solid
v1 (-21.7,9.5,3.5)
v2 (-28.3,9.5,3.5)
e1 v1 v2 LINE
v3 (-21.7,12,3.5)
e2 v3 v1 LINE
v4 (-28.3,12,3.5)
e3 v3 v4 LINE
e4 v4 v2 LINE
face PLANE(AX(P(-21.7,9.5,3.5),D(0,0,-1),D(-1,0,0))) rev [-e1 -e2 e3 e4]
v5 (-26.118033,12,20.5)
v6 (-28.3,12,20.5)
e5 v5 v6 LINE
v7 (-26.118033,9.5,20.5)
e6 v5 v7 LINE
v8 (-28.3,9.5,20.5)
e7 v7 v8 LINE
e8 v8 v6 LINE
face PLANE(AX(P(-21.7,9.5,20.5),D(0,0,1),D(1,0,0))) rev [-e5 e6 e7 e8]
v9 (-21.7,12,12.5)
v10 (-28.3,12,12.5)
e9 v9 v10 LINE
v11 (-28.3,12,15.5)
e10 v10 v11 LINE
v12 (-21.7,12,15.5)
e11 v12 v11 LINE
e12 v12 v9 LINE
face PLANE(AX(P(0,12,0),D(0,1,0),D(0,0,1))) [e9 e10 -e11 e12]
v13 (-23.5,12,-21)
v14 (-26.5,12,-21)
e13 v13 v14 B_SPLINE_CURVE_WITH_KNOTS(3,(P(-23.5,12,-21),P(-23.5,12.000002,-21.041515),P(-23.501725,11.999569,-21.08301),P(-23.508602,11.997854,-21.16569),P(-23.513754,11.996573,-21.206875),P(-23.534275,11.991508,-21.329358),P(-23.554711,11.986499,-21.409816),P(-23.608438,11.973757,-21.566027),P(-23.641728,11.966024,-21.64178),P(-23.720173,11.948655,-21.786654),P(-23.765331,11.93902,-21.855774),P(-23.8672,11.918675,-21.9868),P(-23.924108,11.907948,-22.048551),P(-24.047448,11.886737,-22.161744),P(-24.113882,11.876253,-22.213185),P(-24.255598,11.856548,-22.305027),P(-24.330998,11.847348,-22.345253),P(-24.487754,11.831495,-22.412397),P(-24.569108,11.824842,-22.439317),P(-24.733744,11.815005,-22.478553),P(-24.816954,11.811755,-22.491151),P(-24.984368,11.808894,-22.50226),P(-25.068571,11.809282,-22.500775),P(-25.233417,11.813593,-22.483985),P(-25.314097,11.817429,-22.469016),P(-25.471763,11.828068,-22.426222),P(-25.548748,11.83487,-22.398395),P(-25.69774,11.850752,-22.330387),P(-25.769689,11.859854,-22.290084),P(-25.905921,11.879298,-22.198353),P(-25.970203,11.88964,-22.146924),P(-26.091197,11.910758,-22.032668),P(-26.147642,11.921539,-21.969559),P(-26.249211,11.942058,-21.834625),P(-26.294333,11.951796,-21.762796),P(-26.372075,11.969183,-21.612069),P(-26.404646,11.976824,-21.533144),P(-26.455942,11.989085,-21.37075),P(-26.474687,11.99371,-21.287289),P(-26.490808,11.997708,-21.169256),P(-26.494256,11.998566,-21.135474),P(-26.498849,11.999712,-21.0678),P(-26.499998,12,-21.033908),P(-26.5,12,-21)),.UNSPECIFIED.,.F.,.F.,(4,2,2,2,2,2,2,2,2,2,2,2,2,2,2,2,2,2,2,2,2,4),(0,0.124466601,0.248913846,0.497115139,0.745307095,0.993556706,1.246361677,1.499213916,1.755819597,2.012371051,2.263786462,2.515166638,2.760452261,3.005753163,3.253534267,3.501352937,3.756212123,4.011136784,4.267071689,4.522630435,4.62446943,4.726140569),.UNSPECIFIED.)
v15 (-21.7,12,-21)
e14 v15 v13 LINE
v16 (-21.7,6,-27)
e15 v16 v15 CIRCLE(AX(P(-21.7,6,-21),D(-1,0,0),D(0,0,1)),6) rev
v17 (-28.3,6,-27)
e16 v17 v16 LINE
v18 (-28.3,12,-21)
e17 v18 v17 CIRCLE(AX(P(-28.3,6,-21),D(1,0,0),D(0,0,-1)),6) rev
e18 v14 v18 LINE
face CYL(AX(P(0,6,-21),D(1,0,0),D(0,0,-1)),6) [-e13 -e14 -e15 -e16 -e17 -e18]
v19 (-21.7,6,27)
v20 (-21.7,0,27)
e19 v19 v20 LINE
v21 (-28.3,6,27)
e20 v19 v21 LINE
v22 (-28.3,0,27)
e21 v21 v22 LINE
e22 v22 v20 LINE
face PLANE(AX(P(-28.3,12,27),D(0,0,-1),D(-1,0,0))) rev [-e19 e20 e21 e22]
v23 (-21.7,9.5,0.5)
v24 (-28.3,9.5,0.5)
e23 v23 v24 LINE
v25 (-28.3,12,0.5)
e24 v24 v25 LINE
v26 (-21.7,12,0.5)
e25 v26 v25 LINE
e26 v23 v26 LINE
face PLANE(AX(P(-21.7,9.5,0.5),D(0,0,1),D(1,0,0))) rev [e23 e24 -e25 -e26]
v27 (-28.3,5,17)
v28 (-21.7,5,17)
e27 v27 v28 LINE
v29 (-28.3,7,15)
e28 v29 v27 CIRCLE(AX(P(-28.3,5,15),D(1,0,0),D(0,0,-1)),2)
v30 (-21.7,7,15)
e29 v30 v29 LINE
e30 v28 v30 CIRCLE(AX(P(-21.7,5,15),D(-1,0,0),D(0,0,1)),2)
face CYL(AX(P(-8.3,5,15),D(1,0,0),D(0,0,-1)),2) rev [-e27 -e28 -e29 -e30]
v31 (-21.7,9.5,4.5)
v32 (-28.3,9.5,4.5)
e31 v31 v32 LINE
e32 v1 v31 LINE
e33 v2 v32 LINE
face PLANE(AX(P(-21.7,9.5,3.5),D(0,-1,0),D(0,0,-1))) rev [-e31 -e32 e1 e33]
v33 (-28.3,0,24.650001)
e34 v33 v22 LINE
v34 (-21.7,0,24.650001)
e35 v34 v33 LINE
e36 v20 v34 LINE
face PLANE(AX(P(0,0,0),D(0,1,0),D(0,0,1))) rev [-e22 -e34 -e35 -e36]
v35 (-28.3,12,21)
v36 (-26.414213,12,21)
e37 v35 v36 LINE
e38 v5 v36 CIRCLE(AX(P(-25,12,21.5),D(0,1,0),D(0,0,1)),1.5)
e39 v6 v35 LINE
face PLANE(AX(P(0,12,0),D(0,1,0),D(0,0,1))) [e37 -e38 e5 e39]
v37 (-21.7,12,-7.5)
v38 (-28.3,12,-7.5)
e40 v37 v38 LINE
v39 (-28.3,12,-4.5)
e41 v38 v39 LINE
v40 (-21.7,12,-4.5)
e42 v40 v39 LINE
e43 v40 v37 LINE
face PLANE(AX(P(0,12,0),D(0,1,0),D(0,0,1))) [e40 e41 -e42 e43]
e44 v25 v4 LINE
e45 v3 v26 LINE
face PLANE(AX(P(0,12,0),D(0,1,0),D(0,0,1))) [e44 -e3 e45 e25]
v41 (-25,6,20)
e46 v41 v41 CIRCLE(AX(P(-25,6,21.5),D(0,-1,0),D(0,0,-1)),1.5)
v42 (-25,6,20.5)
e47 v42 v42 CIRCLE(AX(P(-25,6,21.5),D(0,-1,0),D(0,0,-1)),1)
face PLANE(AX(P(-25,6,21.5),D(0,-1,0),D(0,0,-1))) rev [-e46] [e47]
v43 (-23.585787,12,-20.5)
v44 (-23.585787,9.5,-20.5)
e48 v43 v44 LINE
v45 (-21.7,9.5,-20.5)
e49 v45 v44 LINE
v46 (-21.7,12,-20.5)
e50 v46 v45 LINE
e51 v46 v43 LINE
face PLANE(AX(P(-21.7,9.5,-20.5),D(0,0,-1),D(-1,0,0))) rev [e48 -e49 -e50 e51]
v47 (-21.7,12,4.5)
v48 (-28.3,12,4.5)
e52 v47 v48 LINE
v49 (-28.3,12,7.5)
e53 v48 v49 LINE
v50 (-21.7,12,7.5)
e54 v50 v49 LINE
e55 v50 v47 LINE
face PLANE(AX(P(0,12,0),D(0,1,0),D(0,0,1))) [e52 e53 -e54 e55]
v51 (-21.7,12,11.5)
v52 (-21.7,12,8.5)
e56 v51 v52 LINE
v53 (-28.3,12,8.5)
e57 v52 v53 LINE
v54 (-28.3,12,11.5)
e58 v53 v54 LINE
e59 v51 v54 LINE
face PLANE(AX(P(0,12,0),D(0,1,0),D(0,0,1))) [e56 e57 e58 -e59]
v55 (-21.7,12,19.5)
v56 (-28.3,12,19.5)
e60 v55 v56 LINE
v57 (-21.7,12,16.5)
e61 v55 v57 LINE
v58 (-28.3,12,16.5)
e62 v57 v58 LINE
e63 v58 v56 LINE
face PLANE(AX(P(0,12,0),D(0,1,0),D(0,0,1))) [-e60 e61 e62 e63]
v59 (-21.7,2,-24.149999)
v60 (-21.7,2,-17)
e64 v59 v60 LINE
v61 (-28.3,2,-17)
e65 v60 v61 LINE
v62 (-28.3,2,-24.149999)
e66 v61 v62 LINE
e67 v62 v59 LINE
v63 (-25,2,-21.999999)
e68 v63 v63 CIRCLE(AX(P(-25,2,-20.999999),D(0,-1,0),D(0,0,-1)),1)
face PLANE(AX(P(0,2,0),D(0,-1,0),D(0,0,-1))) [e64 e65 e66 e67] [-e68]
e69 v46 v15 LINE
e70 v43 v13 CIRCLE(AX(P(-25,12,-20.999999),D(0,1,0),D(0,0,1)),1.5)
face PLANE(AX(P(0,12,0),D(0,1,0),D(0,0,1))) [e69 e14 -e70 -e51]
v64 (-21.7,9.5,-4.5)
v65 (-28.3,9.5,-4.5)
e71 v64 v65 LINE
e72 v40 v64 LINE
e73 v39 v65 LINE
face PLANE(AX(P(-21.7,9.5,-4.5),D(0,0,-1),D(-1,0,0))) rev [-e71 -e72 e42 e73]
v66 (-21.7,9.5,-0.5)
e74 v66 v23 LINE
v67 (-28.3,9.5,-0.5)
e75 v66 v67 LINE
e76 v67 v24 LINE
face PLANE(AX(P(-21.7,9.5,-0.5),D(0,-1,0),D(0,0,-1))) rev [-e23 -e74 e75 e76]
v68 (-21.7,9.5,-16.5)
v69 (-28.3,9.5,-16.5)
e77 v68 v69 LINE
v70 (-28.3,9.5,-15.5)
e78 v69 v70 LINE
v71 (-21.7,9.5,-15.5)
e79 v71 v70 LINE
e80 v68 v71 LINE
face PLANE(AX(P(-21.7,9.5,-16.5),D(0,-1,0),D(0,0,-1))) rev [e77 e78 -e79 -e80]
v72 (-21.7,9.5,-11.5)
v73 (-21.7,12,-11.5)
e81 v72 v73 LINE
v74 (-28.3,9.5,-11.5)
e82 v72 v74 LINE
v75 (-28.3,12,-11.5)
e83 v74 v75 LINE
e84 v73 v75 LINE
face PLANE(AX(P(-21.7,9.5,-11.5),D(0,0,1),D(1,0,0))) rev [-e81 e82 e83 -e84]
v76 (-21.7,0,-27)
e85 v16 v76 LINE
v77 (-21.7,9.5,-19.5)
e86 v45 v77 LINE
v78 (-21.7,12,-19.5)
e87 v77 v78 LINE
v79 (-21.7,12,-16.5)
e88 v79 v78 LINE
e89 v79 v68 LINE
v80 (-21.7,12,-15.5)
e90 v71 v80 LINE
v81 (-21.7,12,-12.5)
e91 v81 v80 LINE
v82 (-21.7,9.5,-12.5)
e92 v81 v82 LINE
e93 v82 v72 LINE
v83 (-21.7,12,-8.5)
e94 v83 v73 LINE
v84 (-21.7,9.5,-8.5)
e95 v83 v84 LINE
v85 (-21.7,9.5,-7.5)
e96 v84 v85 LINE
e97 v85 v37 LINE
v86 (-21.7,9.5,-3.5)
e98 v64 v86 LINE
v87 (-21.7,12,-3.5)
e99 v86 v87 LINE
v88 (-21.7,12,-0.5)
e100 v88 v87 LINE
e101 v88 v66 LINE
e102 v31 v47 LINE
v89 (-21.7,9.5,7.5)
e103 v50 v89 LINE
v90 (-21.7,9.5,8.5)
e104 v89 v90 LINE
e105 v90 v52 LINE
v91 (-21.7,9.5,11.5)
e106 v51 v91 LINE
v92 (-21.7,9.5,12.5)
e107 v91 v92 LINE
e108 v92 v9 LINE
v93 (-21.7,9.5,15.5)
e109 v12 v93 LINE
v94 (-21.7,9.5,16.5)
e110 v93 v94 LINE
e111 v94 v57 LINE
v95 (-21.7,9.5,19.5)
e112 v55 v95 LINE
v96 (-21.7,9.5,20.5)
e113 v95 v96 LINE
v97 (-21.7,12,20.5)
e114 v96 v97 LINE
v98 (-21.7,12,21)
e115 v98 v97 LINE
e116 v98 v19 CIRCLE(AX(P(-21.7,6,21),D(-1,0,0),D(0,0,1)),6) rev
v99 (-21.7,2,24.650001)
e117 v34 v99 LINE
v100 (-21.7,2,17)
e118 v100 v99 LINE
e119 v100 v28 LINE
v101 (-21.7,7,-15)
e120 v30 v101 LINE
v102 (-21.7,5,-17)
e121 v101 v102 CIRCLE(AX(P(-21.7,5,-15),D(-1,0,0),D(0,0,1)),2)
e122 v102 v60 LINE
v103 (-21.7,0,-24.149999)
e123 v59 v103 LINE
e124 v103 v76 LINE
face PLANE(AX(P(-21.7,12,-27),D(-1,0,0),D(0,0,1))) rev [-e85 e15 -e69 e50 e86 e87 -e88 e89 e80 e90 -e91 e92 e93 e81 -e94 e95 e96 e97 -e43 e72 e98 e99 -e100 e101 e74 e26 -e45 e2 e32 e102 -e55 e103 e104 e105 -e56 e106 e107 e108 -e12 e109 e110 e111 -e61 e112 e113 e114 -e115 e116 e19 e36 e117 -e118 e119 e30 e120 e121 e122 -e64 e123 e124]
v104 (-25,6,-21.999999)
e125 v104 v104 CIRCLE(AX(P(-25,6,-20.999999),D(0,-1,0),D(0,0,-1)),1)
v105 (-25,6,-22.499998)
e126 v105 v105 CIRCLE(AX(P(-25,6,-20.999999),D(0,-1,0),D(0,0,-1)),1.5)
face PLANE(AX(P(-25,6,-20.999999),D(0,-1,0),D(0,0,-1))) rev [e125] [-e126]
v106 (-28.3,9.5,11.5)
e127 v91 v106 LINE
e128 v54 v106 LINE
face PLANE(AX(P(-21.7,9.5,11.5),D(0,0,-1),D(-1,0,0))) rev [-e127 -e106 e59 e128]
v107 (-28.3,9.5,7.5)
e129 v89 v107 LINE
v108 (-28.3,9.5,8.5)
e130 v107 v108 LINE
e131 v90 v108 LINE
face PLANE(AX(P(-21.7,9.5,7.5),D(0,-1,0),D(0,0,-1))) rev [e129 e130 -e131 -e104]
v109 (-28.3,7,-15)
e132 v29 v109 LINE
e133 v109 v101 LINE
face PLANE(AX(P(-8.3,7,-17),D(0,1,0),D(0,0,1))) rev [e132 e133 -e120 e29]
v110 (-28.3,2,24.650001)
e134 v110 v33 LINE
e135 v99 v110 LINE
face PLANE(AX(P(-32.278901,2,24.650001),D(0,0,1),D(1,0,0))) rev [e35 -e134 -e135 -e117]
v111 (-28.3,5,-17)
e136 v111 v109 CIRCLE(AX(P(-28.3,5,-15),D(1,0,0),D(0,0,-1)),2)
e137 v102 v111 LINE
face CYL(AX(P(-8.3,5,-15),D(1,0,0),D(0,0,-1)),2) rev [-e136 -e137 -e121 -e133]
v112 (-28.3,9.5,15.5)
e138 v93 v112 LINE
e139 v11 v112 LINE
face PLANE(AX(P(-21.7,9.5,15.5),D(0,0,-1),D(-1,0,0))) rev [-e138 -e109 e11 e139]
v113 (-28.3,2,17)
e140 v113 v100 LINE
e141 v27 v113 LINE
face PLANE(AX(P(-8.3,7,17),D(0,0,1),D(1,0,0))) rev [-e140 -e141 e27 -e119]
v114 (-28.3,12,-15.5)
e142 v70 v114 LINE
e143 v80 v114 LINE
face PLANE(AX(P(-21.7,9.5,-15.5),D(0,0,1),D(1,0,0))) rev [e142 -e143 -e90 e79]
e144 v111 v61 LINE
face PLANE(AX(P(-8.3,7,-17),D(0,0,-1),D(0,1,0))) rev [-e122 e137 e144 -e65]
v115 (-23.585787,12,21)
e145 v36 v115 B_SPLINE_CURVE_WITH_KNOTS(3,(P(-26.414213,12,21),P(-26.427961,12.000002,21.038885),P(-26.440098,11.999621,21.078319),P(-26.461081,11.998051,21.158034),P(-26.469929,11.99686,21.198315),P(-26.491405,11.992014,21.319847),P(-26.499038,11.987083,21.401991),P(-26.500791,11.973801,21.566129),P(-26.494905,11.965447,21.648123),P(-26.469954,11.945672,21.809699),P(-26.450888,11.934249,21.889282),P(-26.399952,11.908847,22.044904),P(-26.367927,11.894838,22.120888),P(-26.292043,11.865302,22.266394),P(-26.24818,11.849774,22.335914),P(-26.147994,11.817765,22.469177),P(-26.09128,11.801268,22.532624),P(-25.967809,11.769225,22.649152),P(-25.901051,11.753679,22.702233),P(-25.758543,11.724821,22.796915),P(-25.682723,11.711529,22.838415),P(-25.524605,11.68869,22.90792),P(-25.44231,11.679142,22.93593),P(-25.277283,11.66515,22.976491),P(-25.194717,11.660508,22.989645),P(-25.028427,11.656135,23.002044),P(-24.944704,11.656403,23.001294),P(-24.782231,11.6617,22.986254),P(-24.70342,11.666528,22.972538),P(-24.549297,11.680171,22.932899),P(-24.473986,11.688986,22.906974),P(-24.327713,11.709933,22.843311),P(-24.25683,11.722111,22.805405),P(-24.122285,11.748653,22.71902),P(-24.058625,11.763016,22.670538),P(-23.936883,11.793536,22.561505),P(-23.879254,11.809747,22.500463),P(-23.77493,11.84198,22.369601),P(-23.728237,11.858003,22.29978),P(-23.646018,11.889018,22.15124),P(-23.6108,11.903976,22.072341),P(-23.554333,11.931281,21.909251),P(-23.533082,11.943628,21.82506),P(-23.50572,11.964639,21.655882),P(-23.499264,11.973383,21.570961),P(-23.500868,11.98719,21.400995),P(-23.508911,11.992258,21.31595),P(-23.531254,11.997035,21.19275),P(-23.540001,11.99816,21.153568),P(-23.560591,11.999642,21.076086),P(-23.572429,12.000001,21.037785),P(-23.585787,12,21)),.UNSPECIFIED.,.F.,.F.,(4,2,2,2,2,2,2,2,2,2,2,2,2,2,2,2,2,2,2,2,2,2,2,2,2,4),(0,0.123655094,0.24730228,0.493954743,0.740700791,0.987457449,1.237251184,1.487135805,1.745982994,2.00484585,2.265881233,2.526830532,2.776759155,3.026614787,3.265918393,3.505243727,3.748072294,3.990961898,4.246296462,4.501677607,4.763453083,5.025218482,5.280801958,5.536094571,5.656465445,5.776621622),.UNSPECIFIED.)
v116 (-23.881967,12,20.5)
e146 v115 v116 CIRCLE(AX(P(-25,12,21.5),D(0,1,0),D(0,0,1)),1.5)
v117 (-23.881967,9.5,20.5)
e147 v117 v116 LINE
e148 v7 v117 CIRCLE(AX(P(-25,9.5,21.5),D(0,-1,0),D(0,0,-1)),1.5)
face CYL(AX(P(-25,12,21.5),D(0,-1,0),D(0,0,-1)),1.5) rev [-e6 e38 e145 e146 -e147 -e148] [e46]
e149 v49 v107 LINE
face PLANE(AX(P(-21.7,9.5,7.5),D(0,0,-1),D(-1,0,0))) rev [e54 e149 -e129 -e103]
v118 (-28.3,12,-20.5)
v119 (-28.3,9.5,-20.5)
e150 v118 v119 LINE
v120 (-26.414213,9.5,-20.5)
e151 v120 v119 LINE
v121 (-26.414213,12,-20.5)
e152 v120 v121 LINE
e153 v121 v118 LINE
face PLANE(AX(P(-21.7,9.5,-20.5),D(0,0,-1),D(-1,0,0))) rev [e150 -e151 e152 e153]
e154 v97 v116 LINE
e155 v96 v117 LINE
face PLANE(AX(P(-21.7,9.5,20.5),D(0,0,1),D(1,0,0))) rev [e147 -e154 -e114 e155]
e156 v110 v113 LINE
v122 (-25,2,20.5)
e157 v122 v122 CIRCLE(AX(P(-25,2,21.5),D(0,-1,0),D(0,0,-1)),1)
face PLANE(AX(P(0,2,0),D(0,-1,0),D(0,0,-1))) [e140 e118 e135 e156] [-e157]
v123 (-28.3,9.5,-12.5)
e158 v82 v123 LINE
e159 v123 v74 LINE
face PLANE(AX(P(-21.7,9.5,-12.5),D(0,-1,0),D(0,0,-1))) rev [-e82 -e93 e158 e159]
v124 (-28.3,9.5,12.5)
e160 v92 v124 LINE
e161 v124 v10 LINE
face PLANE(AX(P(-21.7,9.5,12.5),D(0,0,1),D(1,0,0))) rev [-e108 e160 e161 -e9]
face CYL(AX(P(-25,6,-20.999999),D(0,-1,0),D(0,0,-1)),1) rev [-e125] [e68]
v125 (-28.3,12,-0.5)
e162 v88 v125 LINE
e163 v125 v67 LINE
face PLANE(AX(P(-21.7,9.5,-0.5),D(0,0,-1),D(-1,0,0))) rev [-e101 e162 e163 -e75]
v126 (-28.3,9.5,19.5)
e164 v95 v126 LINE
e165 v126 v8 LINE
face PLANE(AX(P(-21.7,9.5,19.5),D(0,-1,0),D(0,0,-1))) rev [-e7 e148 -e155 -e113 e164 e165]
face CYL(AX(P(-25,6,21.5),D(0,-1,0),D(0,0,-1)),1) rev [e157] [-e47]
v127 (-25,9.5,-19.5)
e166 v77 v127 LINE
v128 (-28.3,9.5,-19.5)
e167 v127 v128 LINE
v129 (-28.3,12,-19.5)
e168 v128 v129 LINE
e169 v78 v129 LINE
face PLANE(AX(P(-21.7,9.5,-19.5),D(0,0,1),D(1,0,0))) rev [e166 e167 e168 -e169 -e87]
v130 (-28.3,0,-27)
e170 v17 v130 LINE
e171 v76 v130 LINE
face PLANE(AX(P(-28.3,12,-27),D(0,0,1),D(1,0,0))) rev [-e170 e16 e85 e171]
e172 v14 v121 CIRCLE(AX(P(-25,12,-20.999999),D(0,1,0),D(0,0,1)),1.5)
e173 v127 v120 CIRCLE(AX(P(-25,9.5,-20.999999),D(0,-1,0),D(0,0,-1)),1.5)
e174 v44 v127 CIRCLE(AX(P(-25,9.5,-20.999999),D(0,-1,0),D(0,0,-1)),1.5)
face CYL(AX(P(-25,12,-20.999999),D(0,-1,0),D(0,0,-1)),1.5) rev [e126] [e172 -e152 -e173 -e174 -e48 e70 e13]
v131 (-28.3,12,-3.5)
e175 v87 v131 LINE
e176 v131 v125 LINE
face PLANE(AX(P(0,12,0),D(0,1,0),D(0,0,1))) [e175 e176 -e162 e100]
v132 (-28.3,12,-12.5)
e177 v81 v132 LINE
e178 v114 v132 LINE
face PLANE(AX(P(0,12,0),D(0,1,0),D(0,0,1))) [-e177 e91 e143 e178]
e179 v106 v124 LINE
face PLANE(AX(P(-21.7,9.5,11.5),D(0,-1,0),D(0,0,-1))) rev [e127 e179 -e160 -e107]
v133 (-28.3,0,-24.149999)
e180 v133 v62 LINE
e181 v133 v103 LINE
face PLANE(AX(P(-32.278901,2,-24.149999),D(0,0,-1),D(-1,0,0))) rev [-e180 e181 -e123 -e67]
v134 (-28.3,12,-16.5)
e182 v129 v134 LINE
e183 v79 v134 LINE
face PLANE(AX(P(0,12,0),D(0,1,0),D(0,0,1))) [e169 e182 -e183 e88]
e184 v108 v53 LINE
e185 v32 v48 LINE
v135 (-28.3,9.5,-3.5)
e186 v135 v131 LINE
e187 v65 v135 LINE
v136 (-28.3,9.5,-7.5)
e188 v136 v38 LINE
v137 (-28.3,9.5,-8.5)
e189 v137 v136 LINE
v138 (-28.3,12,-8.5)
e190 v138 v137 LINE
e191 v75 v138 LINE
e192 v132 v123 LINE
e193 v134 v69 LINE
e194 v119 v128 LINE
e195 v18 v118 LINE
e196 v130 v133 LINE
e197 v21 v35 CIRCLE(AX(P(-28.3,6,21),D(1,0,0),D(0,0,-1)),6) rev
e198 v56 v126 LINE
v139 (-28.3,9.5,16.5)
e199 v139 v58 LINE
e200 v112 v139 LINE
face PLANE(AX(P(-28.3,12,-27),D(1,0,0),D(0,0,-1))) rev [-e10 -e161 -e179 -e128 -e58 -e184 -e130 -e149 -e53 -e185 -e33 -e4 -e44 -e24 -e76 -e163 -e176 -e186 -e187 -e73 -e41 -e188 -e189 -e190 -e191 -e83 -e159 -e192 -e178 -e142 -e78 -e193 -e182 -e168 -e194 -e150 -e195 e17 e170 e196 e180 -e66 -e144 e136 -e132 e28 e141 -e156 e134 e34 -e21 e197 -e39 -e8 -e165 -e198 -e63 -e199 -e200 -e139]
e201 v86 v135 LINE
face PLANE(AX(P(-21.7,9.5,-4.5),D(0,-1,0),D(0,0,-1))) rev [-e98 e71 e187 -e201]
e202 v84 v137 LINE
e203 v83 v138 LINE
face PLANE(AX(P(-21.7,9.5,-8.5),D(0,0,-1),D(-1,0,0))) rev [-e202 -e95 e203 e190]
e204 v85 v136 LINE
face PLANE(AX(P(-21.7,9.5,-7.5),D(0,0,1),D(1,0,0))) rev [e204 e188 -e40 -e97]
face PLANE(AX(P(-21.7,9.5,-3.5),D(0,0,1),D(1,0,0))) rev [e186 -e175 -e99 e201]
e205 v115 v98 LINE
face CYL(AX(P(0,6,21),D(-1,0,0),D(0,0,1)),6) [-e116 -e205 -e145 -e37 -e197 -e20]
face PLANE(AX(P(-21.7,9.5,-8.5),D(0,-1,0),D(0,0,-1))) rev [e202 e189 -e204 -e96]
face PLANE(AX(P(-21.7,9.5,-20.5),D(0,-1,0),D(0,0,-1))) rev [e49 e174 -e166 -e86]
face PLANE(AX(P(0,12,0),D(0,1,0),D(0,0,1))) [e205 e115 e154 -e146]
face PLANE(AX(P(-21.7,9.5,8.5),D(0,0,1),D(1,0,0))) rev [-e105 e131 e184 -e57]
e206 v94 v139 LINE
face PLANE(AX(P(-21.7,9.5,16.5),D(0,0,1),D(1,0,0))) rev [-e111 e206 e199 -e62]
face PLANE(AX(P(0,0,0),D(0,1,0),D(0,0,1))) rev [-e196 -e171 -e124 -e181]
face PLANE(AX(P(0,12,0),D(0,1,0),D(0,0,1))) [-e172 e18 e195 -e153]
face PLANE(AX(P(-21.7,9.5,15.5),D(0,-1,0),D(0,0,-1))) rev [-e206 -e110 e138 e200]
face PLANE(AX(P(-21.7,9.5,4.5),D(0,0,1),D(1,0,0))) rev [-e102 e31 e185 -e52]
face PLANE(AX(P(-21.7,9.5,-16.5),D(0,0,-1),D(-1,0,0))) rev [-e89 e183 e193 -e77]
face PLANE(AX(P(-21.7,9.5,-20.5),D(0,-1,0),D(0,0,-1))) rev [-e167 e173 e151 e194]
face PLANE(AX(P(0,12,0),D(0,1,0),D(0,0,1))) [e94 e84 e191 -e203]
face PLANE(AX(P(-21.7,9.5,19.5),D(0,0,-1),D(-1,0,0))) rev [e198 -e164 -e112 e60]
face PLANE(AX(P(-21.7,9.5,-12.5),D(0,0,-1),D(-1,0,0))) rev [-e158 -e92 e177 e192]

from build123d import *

# Parameters (mm, degrees)
SKETCH_1_W          = 6.6
SKETCH_1_H          = 54
SKETCH_1_R          = 1.49999954
EXTRUDE_1_DEPTH     = 12
FILLET_1_R          = 6
SKETCH_2_W          = 34
SKETCH_2_H          = 14
CUT_EXTRUDE_1_DEPTH = 20
FILLET_2_R          = 2
SKETCH_3_W          = 1
SKETCH_3_H          = 2.5
CUT_EXTRUDE_2_DEPTH = 31.274742098
SKETCH_4_W          = 14.557801868
SKETCH_4_H          = 48.8
CUT_EXTRUDE_3_DEPTH = 2
SKETCH_6_R          = 1.5
SKETCH_6_R_2        = 1
SKETCH_6_R_3        = 1.49999954
EXTRUDE_2_DEPTH     = 4


with BuildPart() as part:
    # 草图1 → 凸台-拉伸1 (new body)
    with BuildSketch(Plane(origin=(0, 0, 0), x_dir=(1, 0, 0), z_dir=(0, 1, 0))):
        with Locations((-25, 0)):
            Rectangle(SKETCH_1_W, SKETCH_1_H)
        with Locations(Location((-25, -21.49999992, 0), (0, 0, 270))):
            Circle(SKETCH_1_R, mode=Mode.SUBTRACT)
        with Locations(Location((-25, 20.9999989, 0), (0, 0, 270))):
            Circle(SKETCH_1_R, mode=Mode.SUBTRACT)
    extrude(amount=EXTRUDE_1_DEPTH)

    # 圆角1
    # the kernel refuses this fillet: 6 mm, written as the material it takes off along each edge
    with BuildSketch(Plane(origin=(-6.7, 12, 27), x_dir=(0, -1, 0), z_dir=(-1, 0, 0)), Plane(origin=(-43.3, 12, -27), x_dir=(0, -1, 0), z_dir=(1, 0, 0))) as fillet_1_piece_1:
        with BuildLine():
            CenterArc((FILLET_1_R, -FILLET_1_R), FILLET_1_R, 90, 90)
            Line((0, -FILLET_1_R), (0, 0))
            Line((0, 0), (FILLET_1_R, 0))
        make_face()
    extrude(amount=36.6, mode=Mode.SUBTRACT)

    # 草图2 → 切除-拉伸1 (cut)
    with BuildSketch(Plane.ZY.offset(28.3)):
        Rectangle(SKETCH_2_W, SKETCH_2_H)
    extrude(amount=-CUT_EXTRUDE_1_DEPTH, mode=Mode.SUBTRACT)

    # 圆角2
    fillet_2_edges = [part.edges().sort_by_distance(p)[0] for p in [
        (-25, 7, 17),
        (-25, 7, -17),
    ]]
    fillet(fillet_2_edges, radius=FILLET_2_R)

    # 草图3 → 切除-拉伸2 (cut, through all)
    with BuildSketch(Plane.ZY.offset(28.3)):
        with Locations((0, 10.75)):
            Rectangle(SKETCH_3_W, SKETCH_3_H)
        with Locations((4, 10.75)):
            Rectangle(SKETCH_3_W, SKETCH_3_H)
        with Locations((8, 10.75)):
            Rectangle(SKETCH_3_W, SKETCH_3_H)
        with Locations((12, 10.75)):
            Rectangle(SKETCH_3_W, SKETCH_3_H)
        with Locations((16, 10.75)):
            Rectangle(SKETCH_3_W, SKETCH_3_H)
        with Locations((20, 10.75)):
            Rectangle(SKETCH_3_W, SKETCH_3_H)
        with Locations((-4, 10.75)):
            Rectangle(SKETCH_3_W, SKETCH_3_H)
        with Locations((-8, 10.75)):
            Rectangle(SKETCH_3_W, SKETCH_3_H)
        with Locations((-12, 10.75)):
            Rectangle(SKETCH_3_W, SKETCH_3_H)
        with Locations((-16, 10.75)):
            Rectangle(SKETCH_3_W, SKETCH_3_H)
        with Locations((-20, 10.75)):
            Rectangle(SKETCH_3_W, SKETCH_3_H)
    extrude(amount=-CUT_EXTRUDE_2_DEPTH, mode=Mode.SUBTRACT)

    # 草图4 → 切除-拉伸3 (cut)
    with BuildSketch(Plane.XZ):
        with Locations((-25, 0.25000051)):
            Rectangle(SKETCH_4_W, SKETCH_4_H)
    extrude(amount=-CUT_EXTRUDE_3_DEPTH, mode=Mode.SUBTRACT)

    # 草图6 → 凸台-拉伸2 (add)
    # profile 1 of 2: a face of its own
    with BuildSketch(Plane.XZ.offset(-2)):
        with Locations(Location((-25, 21.49999992, 0), (0, 0, 270))):
            Circle(SKETCH_6_R)
        with Locations(Location((-25, 21.49999992, 0), (0, 0, 270))):
            Circle(SKETCH_6_R_2, mode=Mode.SUBTRACT)
    # profile 2 of 2: a face of its own
    with BuildSketch(Plane.XZ.offset(-2)):
        with Locations(Location((-25, -20.9999989, 0), (0, 0, 270))):
            Circle(SKETCH_6_R_3)
        with Locations(Location((-25, -20.9999989, 0), (0, 0, 270))):
            Circle(SKETCH_6_R_2, mode=Mode.SUBTRACT)
    extrude(amount=-EXTRUDE_2_DEPTH)


solid = part.part
